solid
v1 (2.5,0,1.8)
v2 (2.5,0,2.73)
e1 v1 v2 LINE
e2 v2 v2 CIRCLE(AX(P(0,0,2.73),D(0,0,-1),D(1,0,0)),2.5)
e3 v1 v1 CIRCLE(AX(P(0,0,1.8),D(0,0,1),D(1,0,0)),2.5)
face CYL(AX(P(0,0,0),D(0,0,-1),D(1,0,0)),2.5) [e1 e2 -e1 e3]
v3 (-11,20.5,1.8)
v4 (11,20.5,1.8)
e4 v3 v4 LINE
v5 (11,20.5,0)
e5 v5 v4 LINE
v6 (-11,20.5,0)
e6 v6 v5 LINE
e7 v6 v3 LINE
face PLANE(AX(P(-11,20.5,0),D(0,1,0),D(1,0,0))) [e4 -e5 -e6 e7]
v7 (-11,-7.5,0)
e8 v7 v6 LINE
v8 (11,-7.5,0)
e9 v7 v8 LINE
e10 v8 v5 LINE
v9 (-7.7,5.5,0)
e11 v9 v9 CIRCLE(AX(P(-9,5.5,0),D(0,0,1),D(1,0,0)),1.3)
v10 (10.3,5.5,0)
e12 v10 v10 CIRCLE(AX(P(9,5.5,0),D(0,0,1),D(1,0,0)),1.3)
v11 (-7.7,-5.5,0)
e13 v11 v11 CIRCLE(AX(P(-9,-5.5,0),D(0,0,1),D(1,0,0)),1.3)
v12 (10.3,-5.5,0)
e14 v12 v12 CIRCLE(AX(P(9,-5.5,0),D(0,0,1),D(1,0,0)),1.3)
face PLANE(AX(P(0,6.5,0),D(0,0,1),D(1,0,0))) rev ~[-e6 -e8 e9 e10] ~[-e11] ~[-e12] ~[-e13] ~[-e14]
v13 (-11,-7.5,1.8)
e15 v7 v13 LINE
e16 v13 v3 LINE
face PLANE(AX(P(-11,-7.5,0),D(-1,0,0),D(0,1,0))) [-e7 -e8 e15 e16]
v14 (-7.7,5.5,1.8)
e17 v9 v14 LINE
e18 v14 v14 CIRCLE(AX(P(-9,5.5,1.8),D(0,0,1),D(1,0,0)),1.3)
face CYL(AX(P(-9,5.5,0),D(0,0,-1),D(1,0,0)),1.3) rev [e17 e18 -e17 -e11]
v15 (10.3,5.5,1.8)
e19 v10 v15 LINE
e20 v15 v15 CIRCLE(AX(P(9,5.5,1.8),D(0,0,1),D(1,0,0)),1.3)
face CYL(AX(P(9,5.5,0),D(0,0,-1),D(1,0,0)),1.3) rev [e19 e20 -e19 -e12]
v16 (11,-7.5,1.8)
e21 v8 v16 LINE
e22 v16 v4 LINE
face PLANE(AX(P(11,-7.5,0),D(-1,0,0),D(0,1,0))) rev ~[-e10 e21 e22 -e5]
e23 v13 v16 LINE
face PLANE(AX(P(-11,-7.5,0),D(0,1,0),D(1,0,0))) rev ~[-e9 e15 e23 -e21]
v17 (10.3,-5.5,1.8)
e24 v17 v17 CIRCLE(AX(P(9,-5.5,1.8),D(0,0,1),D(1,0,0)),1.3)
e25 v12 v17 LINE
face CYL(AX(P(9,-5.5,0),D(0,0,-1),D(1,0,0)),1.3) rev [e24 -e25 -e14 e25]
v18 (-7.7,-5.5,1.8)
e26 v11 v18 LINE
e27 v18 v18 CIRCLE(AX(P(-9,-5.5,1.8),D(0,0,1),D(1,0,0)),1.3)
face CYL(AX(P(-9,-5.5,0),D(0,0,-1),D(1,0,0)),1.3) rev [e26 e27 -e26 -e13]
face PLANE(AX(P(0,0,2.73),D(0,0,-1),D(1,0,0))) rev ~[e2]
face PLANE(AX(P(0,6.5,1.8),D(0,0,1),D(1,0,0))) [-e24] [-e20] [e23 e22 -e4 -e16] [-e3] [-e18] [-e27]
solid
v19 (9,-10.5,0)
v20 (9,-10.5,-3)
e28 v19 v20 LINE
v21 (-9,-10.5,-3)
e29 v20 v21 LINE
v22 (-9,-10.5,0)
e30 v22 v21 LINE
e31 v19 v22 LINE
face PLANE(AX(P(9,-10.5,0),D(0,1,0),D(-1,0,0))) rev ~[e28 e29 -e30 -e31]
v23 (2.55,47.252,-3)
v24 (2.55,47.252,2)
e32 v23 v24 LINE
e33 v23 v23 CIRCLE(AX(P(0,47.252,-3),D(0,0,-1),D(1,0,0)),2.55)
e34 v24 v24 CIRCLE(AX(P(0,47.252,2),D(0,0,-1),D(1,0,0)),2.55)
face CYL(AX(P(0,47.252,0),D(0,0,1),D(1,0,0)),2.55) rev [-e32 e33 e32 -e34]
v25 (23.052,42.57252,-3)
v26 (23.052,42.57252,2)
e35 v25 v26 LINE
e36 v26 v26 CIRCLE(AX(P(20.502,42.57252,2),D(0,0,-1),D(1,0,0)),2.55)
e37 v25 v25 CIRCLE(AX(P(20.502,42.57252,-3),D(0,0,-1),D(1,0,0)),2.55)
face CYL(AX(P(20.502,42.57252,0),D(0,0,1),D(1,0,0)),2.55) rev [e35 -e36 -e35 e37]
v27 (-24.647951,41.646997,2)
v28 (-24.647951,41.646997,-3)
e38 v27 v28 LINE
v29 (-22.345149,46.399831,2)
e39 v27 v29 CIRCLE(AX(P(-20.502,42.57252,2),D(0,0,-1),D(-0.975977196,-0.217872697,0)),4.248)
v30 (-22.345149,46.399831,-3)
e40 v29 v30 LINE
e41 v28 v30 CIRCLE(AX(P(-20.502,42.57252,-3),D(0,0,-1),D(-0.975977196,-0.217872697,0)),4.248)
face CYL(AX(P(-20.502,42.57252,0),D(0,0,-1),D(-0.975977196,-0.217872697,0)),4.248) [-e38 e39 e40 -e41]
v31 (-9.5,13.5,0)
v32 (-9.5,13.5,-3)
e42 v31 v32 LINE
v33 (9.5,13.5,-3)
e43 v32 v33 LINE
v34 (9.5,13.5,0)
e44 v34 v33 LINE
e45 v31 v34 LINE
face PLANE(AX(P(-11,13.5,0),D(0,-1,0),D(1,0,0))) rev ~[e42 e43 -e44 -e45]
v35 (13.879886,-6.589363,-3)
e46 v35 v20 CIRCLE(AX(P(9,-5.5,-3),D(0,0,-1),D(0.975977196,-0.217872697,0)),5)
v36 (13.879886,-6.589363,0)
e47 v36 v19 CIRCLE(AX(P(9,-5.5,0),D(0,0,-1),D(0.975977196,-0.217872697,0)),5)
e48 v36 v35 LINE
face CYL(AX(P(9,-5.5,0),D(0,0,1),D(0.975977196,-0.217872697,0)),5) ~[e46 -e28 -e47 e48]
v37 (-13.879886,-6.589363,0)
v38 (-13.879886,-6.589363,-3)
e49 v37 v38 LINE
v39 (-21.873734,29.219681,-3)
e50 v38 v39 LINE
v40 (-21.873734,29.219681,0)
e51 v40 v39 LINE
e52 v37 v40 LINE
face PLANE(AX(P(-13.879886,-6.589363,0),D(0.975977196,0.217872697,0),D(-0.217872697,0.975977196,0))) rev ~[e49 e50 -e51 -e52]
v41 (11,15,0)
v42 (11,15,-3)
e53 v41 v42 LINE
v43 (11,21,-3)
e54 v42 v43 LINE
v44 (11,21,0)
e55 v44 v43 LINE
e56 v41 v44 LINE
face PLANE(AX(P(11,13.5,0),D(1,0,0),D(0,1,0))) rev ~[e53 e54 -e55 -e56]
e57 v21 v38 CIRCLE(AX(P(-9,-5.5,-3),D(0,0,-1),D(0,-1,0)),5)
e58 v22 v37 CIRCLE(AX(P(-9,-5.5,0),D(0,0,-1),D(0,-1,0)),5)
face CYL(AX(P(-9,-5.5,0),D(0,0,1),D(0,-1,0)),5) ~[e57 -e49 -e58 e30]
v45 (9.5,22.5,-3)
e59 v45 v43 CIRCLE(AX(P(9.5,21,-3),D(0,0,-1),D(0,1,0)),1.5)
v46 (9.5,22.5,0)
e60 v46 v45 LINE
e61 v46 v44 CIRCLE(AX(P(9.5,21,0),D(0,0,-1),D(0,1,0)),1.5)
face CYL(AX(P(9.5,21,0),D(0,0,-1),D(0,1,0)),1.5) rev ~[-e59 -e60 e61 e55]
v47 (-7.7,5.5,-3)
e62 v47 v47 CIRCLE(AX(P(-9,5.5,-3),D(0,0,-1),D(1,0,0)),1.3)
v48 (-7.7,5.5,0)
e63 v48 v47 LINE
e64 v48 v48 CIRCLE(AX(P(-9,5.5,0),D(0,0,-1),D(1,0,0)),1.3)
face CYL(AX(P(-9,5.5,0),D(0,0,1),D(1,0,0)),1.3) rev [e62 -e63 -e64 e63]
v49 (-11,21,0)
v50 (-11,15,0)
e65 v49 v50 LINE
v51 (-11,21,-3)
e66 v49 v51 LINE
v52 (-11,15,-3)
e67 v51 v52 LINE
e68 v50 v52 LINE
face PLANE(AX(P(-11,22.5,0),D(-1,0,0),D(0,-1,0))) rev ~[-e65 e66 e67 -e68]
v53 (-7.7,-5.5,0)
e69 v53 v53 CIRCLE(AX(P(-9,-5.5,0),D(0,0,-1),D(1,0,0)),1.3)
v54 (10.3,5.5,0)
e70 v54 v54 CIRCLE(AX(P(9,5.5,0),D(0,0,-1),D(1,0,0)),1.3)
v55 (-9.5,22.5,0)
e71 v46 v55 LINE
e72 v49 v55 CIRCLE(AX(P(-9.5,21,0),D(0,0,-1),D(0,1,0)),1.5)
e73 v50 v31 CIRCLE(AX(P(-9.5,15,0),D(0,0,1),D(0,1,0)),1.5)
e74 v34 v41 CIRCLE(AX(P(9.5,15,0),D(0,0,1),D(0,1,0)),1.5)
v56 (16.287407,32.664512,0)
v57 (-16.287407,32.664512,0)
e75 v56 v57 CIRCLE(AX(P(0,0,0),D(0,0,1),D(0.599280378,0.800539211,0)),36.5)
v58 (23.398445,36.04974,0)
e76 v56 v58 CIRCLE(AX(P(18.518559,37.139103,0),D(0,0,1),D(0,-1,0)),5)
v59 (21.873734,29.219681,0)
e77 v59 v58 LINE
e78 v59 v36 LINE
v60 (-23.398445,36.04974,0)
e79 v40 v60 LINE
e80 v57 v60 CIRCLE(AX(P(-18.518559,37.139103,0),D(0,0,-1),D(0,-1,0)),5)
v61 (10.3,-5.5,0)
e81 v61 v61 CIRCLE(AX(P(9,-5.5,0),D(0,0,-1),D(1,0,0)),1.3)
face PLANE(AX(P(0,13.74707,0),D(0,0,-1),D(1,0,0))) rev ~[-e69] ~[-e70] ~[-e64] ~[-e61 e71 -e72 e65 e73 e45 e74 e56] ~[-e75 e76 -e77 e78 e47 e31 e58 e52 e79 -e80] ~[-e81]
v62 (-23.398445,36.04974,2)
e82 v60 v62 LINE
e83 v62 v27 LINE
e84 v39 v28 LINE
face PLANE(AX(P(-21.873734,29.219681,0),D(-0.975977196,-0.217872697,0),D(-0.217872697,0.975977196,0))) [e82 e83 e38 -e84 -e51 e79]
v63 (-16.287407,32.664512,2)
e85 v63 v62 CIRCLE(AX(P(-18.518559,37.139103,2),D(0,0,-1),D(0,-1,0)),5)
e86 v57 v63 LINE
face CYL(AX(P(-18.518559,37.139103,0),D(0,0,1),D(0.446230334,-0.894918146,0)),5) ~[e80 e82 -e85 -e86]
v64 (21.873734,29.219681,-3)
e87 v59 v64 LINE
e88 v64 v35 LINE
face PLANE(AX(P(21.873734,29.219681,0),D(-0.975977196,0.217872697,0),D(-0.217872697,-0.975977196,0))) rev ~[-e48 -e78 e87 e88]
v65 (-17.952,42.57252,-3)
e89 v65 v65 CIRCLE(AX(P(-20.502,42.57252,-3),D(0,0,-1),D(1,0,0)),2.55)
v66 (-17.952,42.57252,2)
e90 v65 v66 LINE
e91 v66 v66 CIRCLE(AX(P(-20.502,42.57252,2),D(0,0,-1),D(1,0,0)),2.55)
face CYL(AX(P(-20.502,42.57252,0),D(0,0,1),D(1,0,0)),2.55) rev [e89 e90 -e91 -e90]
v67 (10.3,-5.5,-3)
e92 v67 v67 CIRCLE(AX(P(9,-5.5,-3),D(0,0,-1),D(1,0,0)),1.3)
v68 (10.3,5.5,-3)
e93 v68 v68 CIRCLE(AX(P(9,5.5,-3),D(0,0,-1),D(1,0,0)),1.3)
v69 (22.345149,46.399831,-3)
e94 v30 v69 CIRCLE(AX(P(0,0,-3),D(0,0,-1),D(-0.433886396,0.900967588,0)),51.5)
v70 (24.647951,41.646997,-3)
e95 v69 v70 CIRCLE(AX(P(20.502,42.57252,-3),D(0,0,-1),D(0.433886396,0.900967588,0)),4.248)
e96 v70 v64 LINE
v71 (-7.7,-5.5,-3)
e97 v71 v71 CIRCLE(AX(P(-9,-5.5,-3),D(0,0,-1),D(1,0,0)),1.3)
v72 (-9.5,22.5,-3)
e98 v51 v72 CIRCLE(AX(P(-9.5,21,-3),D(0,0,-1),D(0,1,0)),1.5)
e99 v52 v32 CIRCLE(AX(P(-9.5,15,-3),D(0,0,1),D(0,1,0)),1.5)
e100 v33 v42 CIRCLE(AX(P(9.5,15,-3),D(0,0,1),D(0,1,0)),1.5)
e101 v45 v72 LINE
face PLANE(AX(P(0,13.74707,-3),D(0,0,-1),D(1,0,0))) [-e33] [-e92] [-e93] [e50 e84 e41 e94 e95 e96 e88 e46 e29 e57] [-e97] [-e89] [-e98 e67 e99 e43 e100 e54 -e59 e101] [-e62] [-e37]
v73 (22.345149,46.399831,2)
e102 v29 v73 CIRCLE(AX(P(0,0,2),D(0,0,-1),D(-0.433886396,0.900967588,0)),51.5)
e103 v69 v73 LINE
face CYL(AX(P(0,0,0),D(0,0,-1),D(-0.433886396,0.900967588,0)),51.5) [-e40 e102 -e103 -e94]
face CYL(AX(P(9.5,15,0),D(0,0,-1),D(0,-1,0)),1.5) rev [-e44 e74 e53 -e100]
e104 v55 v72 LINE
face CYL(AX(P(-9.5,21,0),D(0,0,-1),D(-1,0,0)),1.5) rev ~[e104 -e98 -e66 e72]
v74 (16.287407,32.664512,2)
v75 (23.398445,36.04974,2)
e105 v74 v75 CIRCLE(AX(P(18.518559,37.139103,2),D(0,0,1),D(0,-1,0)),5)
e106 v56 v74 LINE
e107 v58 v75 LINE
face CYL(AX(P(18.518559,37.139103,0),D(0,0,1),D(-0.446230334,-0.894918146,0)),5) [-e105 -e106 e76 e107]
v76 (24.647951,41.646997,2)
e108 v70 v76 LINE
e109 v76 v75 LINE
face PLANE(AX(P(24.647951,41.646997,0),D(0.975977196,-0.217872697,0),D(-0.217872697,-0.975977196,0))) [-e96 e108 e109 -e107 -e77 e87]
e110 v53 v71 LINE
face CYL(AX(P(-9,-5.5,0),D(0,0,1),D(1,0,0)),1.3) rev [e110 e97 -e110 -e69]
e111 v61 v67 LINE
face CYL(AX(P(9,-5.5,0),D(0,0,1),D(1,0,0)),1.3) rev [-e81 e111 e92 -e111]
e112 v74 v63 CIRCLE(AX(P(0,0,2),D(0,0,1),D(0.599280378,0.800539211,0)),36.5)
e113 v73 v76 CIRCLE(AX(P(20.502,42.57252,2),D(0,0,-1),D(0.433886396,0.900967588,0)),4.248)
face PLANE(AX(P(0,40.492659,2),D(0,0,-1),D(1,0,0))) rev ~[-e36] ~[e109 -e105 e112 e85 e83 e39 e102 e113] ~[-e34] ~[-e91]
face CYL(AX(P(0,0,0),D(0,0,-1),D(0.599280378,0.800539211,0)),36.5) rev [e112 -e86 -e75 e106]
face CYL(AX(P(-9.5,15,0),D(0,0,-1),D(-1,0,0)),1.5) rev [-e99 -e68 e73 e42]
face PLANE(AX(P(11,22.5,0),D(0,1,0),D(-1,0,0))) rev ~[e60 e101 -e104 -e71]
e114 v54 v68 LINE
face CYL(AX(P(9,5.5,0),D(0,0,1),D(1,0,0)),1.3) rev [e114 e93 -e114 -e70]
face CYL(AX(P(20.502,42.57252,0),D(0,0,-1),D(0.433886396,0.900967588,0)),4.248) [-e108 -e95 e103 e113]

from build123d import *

# Parameters (mm, degrees)
F0_W     = 22
F0_H     = 28
F0_R     = 1.3
F0_R_2   = 2.5
F1_DEPTH = 1.8
F2_R     = 2.5
F3_DEPTH = 2.73
F4_R     = 2.55
F4_W     = 22
F4_H     = 21
F4_R_2   = 1.3
F5_DEPTH = 3
F6_DEPTH = 2
F7_R     = 5
F8_R     = 1.5


with BuildPart() as f1:
    # F0 (on Top) → F1 (new body)
    with BuildSketch(Plane.XY):
        with Locations((0, 6.5)):
            Rectangle(F0_W, F0_H)
        with Locations((-9, -5.5)):
            Circle(F0_R, mode=Mode.SUBTRACT)
        with Locations((-9, 5.5)):
            Circle(F0_R, mode=Mode.SUBTRACT)
        with Locations((9, -5.5)):
            Circle(F0_R, mode=Mode.SUBTRACT)
        Circle(F0_R_2, mode=Mode.SUBTRACT)
        with Locations((9, 5.5)):
            Circle(F0_R, mode=Mode.SUBTRACT)
    extrude(amount=F1_DEPTH)

    # F2 (on face) → F3 (join)
    with BuildSketch(Plane(origin=(0, 0, 0), x_dir=(1, 0, 0), z_dir=(0, 0, -1))):
        Circle(F2_R)
    extrude(amount=-F3_DEPTH)


with BuildPart() as f5:
    # F4 (on face) → F5 (new body)
    with BuildSketch(Plane(origin=(0, 0, 0), x_dir=(1, 0, 0), z_dir=(0, 0, -1))):
        with BuildLine():
            Line((9, 10.5), (-9, 10.5))
            ThreePointArc((-9, 10.5), (-12.1267541127, 9.4017186878), (-13.8798859815, 6.5893634874))
            Line((-13.8798859815, 6.5893634874), (-21.8737337821, -29.2196812171))
            ThreePointArc((-21.8737337821, -29.2196812171), (0, -36.5), (21.8737337821, -29.2196812171))
            Line((21.8737337821, -29.2196812171), (13.8798859815, 6.5893634874))
            ThreePointArc((13.8798859815, 6.5893634874), (12.1267541127, 9.4017186878), (9, 10.5))
        make_face()
        Polygon((-11, -20.5), (-11, -13.5), (-11, 7.5), (11, 7.5), (11, -13.5), (11, -20.5), (11, -22.5), (-11, -22.5), align=None, mode=Mode.SUBTRACT)
        with BuildLine():
            ThreePointArc((21.8737337821, -29.2196812171), (0, -36.5), (-21.8737337821, -29.2196812171))
            Line((-21.8737337821, -29.2196812171), (-24.6479511299, -41.6469972609))
            ThreePointArc((-24.6479511299, -41.6469972609), (-24.324916161, -44.4247666907), (-22.3451494117, -46.3998307946))
            ThreePointArc((-22.3451494117, -46.3998307946), (0, -51.5), (22.3451494117, -46.3998307946))
            ThreePointArc((22.3451494117, -46.3998307946), (24.324916161, -44.4247666907), (24.6479511299, -41.6469972609))
            Line((24.6479511299, -41.6469972609), (21.8737337821, -29.2196812171))
        make_face()
        with Locations((-20.502, -42.5725204798)):
            Circle(F4_R, mode=Mode.SUBTRACT)
        with Locations((0, -47.252)):
            Circle(F4_R, mode=Mode.SUBTRACT)
        with Locations((20.502, -42.5725204798)):
            Circle(F4_R, mode=Mode.SUBTRACT)
        with Locations((0, -3)):
            Rectangle(F4_W, F4_H)
        with Locations((-9, -5.5)):
            Circle(F4_R_2, mode=Mode.SUBTRACT)
        with Locations((-9, 5.5)):
            Circle(F4_R_2, mode=Mode.SUBTRACT)
        with Locations((9, -5.5)):
            Circle(F4_R_2, mode=Mode.SUBTRACT)
        with Locations((9, 5.5)):
            Circle(F4_R_2, mode=Mode.SUBTRACT)
    extrude(amount=F5_DEPTH)

    # F4 (on face) → F6 (join)
    with BuildSketch(Plane(origin=(0, 0, 0), x_dir=(1, 0, 0), z_dir=(0, 0, -1))):
        with BuildLine():
            ThreePointArc((21.8737337821, -29.2196812171), (0, -36.5), (-21.8737337821, -29.2196812171))
            Line((-21.8737337821, -29.2196812171), (-24.6479511299, -41.6469972609))
            ThreePointArc((-24.6479511299, -41.6469972609), (-24.324916161, -44.4247666907), (-22.3451494117, -46.3998307946))
            ThreePointArc((-22.3451494117, -46.3998307946), (0, -51.5), (22.3451494117, -46.3998307946))
            ThreePointArc((22.3451494117, -46.3998307946), (24.324916161, -44.4247666907), (24.6479511299, -41.6469972609))
            Line((24.6479511299, -41.6469972609), (21.8737337821, -29.2196812171))
        make_face()
        with Locations((-20.502, -42.5725204798)):
            Circle(F4_R, mode=Mode.SUBTRACT)
        with Locations((0, -47.252)):
            Circle(F4_R, mode=Mode.SUBTRACT)
        with Locations((20.502, -42.5725204798)):
            Circle(F4_R, mode=Mode.SUBTRACT)
    extrude(amount=-F6_DEPTH)

    # F7
    f7_edges = [f5.edges().sort_by_distance(p)[0] for p in [
        (21.873734, 29.219681, 1),
        (-21.873734, 29.219681, 1),
    ]]
    fillet(f7_edges, radius=F7_R)

    # F8
    f8_edges = [f5.edges().sort_by_distance(p)[0] for p in [
        (11, 22.5, -1.5),
        (11, 13.5, -1.5),
        (-11, 22.5, -1.5),
        (-11, 13.5, -1.5),
    ]]
    fillet(f8_edges, radius=F8_R)


solid = Compound([f1.part, f5.part])
